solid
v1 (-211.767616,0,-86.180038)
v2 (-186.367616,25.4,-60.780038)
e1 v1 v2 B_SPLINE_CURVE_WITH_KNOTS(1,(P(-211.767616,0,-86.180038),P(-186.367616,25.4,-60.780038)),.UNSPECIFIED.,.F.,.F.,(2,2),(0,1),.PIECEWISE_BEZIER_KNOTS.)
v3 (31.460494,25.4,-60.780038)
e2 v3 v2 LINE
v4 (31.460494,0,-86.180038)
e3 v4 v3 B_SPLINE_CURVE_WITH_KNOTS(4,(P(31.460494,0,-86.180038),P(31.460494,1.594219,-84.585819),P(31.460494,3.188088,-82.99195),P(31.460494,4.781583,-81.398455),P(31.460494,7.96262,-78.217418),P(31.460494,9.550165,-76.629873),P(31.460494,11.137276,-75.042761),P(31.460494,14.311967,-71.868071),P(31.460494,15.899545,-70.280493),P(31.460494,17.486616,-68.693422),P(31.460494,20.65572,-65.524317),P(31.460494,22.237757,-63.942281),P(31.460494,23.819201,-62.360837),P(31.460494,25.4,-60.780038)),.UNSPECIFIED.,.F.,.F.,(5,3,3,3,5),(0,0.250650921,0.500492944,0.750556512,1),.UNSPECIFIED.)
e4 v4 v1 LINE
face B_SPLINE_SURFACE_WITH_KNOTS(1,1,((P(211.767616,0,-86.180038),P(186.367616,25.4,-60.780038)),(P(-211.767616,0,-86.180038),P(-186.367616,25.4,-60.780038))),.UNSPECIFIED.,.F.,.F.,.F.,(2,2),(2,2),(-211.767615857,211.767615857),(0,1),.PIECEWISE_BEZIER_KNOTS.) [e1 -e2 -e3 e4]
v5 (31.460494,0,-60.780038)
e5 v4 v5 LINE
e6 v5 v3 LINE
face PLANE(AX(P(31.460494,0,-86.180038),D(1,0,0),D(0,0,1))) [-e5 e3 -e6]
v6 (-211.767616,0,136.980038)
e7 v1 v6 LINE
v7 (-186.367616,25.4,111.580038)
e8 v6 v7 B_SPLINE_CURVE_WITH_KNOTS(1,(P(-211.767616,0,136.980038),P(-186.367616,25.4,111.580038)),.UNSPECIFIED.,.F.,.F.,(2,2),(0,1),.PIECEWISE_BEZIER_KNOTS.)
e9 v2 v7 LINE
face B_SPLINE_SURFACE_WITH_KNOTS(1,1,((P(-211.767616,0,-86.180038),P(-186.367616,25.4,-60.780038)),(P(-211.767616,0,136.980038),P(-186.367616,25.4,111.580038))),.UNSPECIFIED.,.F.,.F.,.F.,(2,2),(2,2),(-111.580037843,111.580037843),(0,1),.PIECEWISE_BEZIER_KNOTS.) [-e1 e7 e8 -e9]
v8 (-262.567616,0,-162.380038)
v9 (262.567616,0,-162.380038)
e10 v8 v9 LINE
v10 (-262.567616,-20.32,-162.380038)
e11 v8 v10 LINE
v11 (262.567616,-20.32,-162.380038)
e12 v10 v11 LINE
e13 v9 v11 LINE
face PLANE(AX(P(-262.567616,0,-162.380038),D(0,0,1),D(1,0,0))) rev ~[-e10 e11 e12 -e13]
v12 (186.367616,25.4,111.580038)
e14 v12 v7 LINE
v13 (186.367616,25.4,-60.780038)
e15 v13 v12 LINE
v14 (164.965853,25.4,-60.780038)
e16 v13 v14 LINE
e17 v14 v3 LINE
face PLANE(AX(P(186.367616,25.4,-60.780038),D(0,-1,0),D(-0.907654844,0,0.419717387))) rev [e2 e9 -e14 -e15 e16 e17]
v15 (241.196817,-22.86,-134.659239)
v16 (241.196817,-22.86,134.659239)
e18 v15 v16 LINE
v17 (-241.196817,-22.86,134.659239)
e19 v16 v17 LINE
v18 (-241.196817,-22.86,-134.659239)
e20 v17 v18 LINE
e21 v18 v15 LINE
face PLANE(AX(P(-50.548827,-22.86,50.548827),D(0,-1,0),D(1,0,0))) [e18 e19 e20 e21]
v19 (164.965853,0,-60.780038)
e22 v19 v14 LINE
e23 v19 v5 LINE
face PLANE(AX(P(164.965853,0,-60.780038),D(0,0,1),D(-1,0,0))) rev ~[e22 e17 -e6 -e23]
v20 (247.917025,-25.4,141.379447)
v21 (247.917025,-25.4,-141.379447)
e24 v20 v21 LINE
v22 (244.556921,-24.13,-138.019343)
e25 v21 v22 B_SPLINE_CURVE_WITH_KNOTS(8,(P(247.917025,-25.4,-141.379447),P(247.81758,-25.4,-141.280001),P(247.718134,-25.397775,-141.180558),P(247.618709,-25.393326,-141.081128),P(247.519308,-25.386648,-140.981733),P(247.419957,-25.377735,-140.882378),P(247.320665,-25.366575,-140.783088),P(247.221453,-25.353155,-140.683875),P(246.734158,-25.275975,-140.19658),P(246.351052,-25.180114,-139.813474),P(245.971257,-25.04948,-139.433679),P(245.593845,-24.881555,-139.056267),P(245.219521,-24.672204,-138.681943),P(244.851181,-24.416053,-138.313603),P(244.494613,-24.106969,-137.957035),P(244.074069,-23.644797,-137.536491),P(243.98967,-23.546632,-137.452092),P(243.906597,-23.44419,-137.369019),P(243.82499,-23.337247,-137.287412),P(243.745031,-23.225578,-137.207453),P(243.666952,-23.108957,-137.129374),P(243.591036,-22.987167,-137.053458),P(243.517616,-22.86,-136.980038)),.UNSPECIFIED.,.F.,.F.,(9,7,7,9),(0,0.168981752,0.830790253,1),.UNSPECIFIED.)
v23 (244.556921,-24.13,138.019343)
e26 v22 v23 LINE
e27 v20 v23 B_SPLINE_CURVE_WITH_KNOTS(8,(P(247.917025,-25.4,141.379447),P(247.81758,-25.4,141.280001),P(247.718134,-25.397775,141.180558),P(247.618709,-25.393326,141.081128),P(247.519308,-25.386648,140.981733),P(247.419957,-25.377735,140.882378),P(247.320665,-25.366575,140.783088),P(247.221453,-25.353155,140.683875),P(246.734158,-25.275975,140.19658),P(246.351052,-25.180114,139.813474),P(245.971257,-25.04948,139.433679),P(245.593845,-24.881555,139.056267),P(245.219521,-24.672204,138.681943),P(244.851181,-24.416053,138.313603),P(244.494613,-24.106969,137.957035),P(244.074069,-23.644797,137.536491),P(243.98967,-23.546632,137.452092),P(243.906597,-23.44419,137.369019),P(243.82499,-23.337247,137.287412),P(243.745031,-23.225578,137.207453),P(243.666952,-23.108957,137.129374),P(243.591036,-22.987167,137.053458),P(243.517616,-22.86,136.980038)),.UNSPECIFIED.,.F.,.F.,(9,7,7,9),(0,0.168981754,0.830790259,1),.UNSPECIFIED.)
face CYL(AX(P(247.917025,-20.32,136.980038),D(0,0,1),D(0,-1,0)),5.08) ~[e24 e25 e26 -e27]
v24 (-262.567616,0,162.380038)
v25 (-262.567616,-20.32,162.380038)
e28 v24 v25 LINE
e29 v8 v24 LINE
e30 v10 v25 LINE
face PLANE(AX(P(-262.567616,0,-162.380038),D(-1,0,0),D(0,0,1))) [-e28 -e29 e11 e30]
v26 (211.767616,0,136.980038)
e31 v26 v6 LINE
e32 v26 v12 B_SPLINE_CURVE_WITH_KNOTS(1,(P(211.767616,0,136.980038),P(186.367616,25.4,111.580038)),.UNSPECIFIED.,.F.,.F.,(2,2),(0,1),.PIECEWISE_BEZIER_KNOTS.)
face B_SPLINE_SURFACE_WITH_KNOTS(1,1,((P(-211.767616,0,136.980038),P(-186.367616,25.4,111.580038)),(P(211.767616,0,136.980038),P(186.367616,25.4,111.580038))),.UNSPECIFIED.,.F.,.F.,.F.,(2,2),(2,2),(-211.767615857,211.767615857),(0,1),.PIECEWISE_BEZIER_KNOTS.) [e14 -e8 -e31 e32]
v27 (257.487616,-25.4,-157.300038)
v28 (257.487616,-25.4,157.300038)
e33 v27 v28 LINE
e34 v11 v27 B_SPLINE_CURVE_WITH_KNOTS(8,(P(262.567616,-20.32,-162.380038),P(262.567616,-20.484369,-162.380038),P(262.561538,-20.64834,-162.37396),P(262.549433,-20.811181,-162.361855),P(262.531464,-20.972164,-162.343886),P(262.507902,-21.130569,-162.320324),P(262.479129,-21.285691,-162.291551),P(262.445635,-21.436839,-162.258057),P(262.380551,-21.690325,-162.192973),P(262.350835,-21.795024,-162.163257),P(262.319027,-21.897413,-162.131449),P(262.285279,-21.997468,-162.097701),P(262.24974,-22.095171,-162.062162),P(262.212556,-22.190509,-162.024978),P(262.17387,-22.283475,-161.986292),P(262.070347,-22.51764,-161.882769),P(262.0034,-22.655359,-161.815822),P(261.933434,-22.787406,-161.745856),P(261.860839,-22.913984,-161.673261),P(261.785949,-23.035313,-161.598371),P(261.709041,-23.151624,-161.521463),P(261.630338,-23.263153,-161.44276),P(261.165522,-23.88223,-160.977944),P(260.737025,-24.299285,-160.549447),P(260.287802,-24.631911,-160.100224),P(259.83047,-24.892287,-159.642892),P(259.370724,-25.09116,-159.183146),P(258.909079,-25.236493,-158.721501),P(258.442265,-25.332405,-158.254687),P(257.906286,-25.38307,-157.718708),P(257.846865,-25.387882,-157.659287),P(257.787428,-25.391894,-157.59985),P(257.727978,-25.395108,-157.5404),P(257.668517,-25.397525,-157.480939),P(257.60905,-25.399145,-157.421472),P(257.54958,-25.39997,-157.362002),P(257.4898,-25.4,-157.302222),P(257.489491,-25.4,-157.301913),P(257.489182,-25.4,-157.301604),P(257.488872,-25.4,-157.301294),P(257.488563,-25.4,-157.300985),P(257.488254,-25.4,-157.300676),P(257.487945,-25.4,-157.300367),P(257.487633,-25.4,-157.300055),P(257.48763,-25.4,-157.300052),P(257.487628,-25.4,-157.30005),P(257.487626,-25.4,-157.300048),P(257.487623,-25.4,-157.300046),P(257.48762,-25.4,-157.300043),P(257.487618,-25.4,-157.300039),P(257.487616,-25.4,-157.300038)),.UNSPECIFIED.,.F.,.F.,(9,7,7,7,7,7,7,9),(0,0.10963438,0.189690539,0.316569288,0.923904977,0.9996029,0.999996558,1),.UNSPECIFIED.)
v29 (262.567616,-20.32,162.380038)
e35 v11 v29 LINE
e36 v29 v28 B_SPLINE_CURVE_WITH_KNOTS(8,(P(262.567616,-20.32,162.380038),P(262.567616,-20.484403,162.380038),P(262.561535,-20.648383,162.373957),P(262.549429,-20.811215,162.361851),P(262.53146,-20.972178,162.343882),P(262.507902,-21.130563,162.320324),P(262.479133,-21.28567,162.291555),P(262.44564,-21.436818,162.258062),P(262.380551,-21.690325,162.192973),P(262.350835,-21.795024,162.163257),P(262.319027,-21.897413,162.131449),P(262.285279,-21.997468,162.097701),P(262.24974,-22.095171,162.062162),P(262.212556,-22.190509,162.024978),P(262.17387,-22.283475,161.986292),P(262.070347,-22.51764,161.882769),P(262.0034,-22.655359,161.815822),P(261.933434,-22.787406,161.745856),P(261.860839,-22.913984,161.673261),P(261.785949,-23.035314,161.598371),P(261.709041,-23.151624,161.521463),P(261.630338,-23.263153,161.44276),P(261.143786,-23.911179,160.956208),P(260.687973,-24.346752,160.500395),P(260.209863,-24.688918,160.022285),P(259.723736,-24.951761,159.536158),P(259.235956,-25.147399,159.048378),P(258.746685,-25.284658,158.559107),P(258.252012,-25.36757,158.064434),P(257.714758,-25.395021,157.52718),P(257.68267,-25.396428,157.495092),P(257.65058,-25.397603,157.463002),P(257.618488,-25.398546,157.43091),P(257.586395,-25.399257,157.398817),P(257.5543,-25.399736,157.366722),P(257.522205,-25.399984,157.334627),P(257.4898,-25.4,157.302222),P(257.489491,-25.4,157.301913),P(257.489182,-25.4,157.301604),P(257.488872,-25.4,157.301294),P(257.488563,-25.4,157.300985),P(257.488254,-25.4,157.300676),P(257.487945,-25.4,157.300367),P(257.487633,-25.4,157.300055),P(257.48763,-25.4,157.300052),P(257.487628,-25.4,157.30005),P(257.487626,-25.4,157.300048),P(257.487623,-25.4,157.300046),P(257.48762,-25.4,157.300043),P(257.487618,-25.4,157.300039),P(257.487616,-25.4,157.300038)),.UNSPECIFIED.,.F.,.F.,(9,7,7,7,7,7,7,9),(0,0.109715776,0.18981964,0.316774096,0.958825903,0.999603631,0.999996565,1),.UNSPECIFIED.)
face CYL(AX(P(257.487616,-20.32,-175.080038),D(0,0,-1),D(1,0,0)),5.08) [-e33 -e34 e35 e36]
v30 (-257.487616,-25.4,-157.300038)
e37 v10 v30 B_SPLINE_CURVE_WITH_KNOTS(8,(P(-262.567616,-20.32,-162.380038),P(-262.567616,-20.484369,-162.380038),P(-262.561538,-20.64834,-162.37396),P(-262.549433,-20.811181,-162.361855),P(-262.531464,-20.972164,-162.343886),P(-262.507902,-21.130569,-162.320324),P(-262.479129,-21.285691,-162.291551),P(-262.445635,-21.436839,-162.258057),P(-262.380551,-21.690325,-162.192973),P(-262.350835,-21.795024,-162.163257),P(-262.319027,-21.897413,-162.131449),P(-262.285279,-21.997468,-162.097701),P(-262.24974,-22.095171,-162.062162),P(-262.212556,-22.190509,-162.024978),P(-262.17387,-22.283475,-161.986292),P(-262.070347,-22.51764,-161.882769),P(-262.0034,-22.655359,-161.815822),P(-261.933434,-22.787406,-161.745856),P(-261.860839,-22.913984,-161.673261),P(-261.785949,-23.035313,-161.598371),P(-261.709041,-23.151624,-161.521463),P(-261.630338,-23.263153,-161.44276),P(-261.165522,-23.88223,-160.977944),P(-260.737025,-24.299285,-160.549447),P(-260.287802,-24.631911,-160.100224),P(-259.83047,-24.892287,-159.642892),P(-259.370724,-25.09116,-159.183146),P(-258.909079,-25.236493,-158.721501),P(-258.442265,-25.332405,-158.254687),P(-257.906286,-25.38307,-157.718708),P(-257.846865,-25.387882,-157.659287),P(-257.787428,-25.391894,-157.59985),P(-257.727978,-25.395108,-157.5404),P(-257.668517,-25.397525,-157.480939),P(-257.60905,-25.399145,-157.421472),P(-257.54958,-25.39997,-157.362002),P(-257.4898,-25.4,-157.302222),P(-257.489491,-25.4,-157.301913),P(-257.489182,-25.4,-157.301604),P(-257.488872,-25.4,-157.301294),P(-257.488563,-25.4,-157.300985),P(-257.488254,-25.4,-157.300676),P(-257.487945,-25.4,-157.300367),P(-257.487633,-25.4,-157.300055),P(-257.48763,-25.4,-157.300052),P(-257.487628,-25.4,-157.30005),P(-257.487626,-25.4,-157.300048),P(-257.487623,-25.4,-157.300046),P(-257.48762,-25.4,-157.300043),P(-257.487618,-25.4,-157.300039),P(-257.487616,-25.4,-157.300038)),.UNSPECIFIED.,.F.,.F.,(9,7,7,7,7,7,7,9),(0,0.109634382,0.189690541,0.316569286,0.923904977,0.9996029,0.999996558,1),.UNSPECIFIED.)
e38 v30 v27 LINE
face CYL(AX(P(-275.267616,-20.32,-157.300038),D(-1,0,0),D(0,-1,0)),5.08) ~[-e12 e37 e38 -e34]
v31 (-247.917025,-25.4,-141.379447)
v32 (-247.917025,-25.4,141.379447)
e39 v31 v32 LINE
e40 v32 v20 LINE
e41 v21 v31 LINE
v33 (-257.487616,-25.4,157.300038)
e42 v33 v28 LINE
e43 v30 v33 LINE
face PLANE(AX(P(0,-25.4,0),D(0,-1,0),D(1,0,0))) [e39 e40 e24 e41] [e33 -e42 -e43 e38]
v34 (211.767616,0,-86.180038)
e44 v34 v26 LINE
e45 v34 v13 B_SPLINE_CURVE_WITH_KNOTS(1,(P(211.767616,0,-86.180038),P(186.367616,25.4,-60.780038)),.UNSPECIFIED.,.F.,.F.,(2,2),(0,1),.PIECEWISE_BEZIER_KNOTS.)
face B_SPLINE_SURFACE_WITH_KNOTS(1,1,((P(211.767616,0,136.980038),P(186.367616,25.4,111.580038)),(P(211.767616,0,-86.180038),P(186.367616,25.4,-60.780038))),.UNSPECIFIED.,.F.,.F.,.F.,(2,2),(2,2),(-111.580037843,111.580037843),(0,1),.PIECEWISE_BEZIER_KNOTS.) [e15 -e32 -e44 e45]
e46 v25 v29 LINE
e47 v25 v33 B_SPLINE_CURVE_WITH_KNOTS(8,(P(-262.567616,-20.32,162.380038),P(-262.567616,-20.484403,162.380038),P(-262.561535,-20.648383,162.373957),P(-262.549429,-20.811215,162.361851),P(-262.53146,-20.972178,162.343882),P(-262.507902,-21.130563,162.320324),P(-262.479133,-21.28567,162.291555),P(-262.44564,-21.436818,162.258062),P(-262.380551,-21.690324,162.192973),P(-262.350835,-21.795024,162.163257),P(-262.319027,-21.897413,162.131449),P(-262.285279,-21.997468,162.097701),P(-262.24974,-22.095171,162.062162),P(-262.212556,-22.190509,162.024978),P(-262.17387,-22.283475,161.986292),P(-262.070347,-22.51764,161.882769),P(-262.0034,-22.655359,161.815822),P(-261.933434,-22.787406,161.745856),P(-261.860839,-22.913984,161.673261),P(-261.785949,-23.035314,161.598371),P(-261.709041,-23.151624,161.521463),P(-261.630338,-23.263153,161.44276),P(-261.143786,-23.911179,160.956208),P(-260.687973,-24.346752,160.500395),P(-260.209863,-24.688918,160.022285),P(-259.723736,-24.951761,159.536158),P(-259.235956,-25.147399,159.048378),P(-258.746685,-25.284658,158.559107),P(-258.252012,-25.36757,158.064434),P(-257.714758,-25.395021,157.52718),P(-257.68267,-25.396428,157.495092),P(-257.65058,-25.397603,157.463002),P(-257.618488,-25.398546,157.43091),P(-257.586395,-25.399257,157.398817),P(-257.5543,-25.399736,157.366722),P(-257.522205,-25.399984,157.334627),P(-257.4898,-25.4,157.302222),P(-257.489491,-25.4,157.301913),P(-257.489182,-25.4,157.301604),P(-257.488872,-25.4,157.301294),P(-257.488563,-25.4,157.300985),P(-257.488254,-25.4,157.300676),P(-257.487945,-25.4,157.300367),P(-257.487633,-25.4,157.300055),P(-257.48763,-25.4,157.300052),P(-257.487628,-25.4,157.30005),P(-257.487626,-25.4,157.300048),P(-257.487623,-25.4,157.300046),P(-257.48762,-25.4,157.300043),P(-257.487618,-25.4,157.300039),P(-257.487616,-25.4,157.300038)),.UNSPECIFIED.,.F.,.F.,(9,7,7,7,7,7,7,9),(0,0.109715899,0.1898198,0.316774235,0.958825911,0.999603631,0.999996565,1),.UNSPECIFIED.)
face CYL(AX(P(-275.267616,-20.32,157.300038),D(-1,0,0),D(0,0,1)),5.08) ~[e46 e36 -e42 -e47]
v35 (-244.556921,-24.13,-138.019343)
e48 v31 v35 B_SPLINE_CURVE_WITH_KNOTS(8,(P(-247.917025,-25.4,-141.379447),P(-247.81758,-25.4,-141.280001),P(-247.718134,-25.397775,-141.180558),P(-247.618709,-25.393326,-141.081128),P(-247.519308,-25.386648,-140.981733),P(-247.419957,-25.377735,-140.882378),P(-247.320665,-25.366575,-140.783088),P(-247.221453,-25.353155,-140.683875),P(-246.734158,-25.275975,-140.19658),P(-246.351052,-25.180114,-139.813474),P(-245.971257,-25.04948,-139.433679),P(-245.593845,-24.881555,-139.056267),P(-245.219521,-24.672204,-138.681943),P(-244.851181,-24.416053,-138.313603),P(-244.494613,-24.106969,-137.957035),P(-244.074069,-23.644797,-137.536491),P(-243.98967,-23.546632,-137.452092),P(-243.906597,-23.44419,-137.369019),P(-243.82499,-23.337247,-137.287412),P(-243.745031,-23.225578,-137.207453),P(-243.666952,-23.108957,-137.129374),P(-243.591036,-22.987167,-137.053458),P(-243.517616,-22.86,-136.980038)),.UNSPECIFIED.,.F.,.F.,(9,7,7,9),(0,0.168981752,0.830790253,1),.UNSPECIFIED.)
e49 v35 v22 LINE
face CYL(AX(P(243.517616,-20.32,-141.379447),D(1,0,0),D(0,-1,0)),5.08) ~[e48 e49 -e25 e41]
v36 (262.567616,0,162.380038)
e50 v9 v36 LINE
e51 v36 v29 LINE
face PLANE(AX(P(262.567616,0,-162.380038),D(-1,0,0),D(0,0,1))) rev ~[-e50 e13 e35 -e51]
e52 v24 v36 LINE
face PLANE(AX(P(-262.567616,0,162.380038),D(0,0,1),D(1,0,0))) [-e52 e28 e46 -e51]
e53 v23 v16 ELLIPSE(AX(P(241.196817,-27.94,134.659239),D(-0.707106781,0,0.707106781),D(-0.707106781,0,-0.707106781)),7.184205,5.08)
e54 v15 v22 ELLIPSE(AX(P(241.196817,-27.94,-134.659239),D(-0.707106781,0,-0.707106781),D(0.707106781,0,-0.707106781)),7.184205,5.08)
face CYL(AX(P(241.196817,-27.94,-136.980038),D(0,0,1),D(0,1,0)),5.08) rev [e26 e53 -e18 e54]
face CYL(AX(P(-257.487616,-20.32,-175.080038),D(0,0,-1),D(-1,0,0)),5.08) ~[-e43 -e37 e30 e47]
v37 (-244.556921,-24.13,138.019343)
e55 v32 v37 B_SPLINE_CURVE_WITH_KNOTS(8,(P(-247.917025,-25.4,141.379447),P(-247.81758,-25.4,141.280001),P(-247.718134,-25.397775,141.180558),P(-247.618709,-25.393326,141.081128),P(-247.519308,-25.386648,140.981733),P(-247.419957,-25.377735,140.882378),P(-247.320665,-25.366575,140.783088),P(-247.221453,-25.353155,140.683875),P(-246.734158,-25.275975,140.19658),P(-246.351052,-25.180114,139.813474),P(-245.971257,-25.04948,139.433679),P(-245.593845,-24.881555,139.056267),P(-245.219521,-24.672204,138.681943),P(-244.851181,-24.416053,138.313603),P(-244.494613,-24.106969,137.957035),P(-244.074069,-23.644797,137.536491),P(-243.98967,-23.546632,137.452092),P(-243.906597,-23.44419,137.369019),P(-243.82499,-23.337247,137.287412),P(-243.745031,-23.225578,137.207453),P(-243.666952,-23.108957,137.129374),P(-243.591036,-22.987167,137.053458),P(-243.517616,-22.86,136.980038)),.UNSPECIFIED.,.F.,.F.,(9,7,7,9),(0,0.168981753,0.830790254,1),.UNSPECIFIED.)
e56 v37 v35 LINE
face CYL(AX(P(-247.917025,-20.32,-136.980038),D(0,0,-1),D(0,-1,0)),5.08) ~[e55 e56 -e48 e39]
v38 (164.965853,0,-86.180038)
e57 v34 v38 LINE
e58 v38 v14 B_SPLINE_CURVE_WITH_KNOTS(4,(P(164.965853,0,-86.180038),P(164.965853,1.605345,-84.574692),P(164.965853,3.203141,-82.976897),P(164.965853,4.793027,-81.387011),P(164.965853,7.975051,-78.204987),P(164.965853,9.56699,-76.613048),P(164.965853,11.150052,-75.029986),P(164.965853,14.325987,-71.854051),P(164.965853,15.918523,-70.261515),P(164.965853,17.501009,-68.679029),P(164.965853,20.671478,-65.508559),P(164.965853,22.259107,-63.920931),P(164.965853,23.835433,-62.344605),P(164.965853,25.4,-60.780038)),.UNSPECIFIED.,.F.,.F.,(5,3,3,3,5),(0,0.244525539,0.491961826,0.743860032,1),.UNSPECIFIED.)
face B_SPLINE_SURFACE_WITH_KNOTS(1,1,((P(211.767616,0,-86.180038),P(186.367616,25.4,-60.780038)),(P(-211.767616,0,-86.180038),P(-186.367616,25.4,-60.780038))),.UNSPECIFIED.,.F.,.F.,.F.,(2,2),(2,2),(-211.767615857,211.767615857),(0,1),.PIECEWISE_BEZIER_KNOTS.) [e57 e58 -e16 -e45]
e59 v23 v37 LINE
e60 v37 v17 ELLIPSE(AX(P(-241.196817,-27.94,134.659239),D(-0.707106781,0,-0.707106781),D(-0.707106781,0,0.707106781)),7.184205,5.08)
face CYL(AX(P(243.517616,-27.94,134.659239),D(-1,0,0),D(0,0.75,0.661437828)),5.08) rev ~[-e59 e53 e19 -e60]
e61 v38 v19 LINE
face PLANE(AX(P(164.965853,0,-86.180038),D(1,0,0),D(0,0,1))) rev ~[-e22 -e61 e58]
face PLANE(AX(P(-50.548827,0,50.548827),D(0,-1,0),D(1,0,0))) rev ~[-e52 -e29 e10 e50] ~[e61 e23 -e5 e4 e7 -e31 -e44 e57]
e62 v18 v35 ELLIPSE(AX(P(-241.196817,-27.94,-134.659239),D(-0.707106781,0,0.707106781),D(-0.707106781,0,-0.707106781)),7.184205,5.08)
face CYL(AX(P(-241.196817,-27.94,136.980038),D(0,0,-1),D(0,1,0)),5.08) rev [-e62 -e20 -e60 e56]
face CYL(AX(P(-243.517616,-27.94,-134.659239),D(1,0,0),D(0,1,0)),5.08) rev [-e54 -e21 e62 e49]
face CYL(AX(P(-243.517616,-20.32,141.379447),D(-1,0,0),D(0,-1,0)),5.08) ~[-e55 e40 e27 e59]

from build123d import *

# Parameters (mm, degrees)
F0_W         = 525.1352317132
F0_H         = 324.7600756863
F0_W_2       = 487.0352317132
F0_H_2       = 273.9600756863
F1_DEPTH     = 25.4
F2_DEPTH     = 22.86
F3_T1_DEPTH  = 550.5352317132
F3_T3_DEPTH  = 350.1600756863
F3_T5_DEPTH  = 487.0352317132
F3_T7_DEPTH  = 273.9600756863
F3_T13_DEPTH = 498.0337543413
F3_T17_DEPTH = 284.9585983143
F3_T24_DEPTH = 498.0337543413
F3_T28_DEPTH = 284.9585983143
F3_T35_DEPTH = 284.9585983143
F3_T39_DEPTH = 498.0337543413
F3_T46_DEPTH = 498.0337543413
F3_T50_DEPTH = 284.9585983143
F4_R         = 5.08
F5_W         = 423.5352317132
F5_H         = 223.1600756863
F6_DEPTH     = 25.4
F6_TAPER     = 45
F7_W         = 133.505359292
F7_H         = 25.4
F8_DEPTH     = 25.4


# Not quite as in the source:
# - a fillet or chamfer that OpenCascade refuses, or shapes differently, is made with other operations: its cross-section is extruded or revolved along the edge and cut away or added


with BuildPart() as f1:
    # F0 (on Front) → F1 (new body)
    with BuildSketch(Plane.XZ):
        Rectangle(F0_W, F0_H)
        Rectangle(F0_W_2, F0_H_2, mode=Mode.SUBTRACT)
    extrude(amount=F1_DEPTH)

    # F0 (on Front) → F2 (join)
    with BuildSketch(Plane.XZ):
        Polygon((-243.5176158566, 136.9800378431), (-243.5176158566, -136.9800378431), (243.5176158566, 136.9800378431), align=None)
        Polygon((-243.5176158566, -136.9800378431), (243.5176158566, -136.9800378431), (243.5176158566, 136.9800378431), align=None)
    extrude(amount=F2_DEPTH)

    # F3: fillet of radius 5.08 on 8 edges, made by hand

    # F3_s2 → F3_t1 (cut)
    with BuildSketch(Plane.YZ.offset(-275.2676158566)):
        with BuildLine():
            ThreePointArc((-20.32, 162.3800378431), (-23.9121024484, 160.8921402916), (-25.4, 157.3000378431))
            Line((-25.4, 157.3000378431), (-25.4, 162.3800378431))
            Line((-25.4, 162.3800378431), (-20.32, 162.3800378431))
        make_face()
        with BuildLine():
            ThreePointArc((-25.4, -157.3000378431), (-23.9121024484, -160.8921402916), (-20.32, -162.3800378431))
            Line((-20.32, -162.3800378431), (-25.4, -162.3800378431))
            Line((-25.4, -162.3800378431), (-25.4, -157.3000378431))
        make_face()
    extrude(amount=F3_T1_DEPTH, mode=Mode.SUBTRACT)

    # F3_s4 → F3_t3 (cut)
    with BuildSketch(Plane.XY.offset(-175.0800378431)):
        with BuildLine():
            ThreePointArc((-262.5676158566, -20.32), (-261.079718305, -23.9121024484), (-257.4876158566, -25.4))
            Line((-257.4876158566, -25.4), (-262.5676158566, -25.4))
            Line((-262.5676158566, -25.4), (-262.5676158566, -20.32))
        make_face()
        with BuildLine():
            ThreePointArc((262.5676158566, -20.32), (261.079718305, -23.9121024484), (257.4876158566, -25.4))
            Line((257.4876158566, -25.4), (262.5676158566, -25.4))
            Line((262.5676158566, -25.4), (262.5676158566, -20.32))
        make_face()
    extrude(amount=F3_T3_DEPTH, mode=Mode.SUBTRACT)

    # F3_s6 → F3_t5 (cut)
    with BuildSketch(Plane.YZ.offset(-243.5176158566)):
        with BuildLine():
            ThreePointArc((-25.4, 141.3794468944), (-24.7194090512, 138.8394468944), (-22.86, 136.9800378431))
            Line((-22.86, 136.9800378431), (-25.4, 136.9800378431))
            Line((-25.4, 136.9800378431), (-25.4, 141.3794468944))
        make_face()
        with BuildLine():
            ThreePointArc((-25.4, -141.3794468944), (-24.7194090512, -138.8394468944), (-22.86, -136.9800378431))
            Line((-22.86, -136.9800378431), (-25.4, -136.9800378431))
            Line((-25.4, -136.9800378431), (-25.4, -141.3794468944))
        make_face()
    extrude(amount=F3_T5_DEPTH, mode=Mode.SUBTRACT)

    # F3_s8 → F3_t7 (cut)
    with BuildSketch(Plane.XY.offset(-136.9800378431)):
        with BuildLine():
            ThreePointArc((247.9170249078, -25.4), (245.3770249078, -24.7194090512), (243.5176158566, -22.86))
            Line((243.5176158566, -22.86), (243.5176158566, -25.4))
            Line((243.5176158566, -25.4), (247.9170249078, -25.4))
        make_face()
        with BuildLine():
            ThreePointArc((-247.9170249078, -25.4), (-245.3770249078, -24.7194090512), (-243.5176158566, -22.86))
            Line((-243.5176158566, -22.86), (-243.5176158566, -25.4))
            Line((-243.5176158566, -25.4), (-247.9170249078, -25.4))
        make_face()
    extrude(amount=F3_T7_DEPTH, mode=Mode.SUBTRACT)


with BuildPart() as f3_tool11:
    # F3_s12 → F3_t13 (new body)
    with BuildSketch(Plane.YZ.offset(-254.5161384847)):
        with BuildLine():
            ThreePointArc((-25.4, 141.3794468944), (-24.7194090512, 138.8394468944), (-22.86, 136.9800378431))
            Line((-22.86, 136.9800378431), (-25.4, 136.9800378431))
            Line((-25.4, 136.9800378431), (-25.4, 141.3794468944))
        make_face()
    extrude(amount=F3_T13_DEPTH)

    split(bisect_by=Plane.YZ.offset(-243.5176158566), keep=Keep.BOTTOM)


with BuildPart() as f3_tool15:
    # F3_s16 → F3_t17 (new body)
    with BuildSketch(Plane.XY.offset(-136.9800378431)):
        with BuildLine():
            ThreePointArc((-247.9170249078, -25.4), (-245.3770249078, -24.7194090512), (-243.5176158566, -22.86))
            Line((-243.5176158566, -22.86), (-243.5176158566, -25.4))
            Line((-243.5176158566, -25.4), (-247.9170249078, -25.4))
        make_face()
    extrude(amount=F3_T17_DEPTH)

    split(bisect_by=Plane.XY.offset(136.9800378431), keep=Keep.TOP)


with BuildPart() as f3_tool11_1:
    add(f3_tool11.part)

    # F3_t19: intersect F3_tool15
    add(f3_tool15.part, mode=Mode.INTERSECT)


with BuildPart() as f1_1:
    add(f1.part)

    # F3_t9: cut F3_tool11
    add(f3_tool11_1.part, mode=Mode.SUBTRACT)


with BuildPart() as f3_tool22:
    # F3_s23 → F3_t24 (new body)
    with BuildSketch(Plane.YZ.offset(-243.5176158566)):
        with BuildLine():
            ThreePointArc((-25.4, 141.3794468944), (-24.7194090512, 138.8394468944), (-22.86, 136.9800378431))
            Line((-22.86, 136.9800378431), (-25.4, 136.9800378431))
            Line((-25.4, 136.9800378431), (-25.4, 141.3794468944))
        make_face()
    extrude(amount=F3_T24_DEPTH)

    split(bisect_by=Plane.YZ.offset(243.5176158566), keep=Keep.TOP)


with BuildPart() as f3_tool26:
    # F3_s27 → F3_t28 (new body)
    with BuildSketch(Plane.XY.offset(147.9785604712)):
        with BuildLine():
            ThreePointArc((247.9170249078, -25.4), (245.3770249078, -24.7194090512), (243.5176158566, -22.86))
            Line((243.5176158566, -22.86), (243.5176158566, -25.4))
            Line((243.5176158566, -25.4), (247.9170249078, -25.4))
        make_face()
    extrude(amount=-F3_T28_DEPTH)

    split(bisect_by=Plane.XY.offset(136.9800378431), keep=Keep.TOP)


with BuildPart() as f3_tool22_1:
    add(f3_tool22.part)

    # F3_t30: intersect F3_tool26
    add(f3_tool26.part, mode=Mode.INTERSECT)


with BuildPart() as f1_2:
    add(f1_1.part)

    # F3_t20: cut F3_tool22
    add(f3_tool22_1.part, mode=Mode.SUBTRACT)


with BuildPart() as f3_tool33:
    # F3_s34 → F3_t35 (new body)
    with BuildSketch(Plane.XY.offset(136.9800378431)):
        with BuildLine():
            ThreePointArc((247.9170249078, -25.4), (245.3770249078, -24.7194090512), (243.5176158566, -22.86))
            Line((243.5176158566, -22.86), (243.5176158566, -25.4))
            Line((243.5176158566, -25.4), (247.9170249078, -25.4))
        make_face()
    extrude(amount=-F3_T35_DEPTH)

    split(bisect_by=Plane.XY.offset(-136.9800378431), keep=Keep.BOTTOM)


with BuildPart() as f3_tool37:
    # F3_s38 → F3_t39 (new body)
    with BuildSketch(Plane.YZ.offset(254.5161384847)):
        with BuildLine():
            ThreePointArc((-25.4, -141.3794468944), (-24.7194090512, -138.8394468944), (-22.86, -136.9800378431))
            Line((-22.86, -136.9800378431), (-25.4, -136.9800378431))
            Line((-25.4, -136.9800378431), (-25.4, -141.3794468944))
        make_face()
    extrude(amount=-F3_T39_DEPTH)

    split(bisect_by=Plane.YZ.offset(243.5176158566), keep=Keep.TOP)


with BuildPart() as f3_tool33_1:
    add(f3_tool33.part)

    # F3_t41: intersect F3_tool37
    add(f3_tool37.part, mode=Mode.INTERSECT)


with BuildPart() as f1_3:
    add(f1_2.part)

    # F3_t31: cut F3_tool33
    add(f3_tool33_1.part, mode=Mode.SUBTRACT)


with BuildPart() as f3_tool44:
    # F3_s45 → F3_t46 (new body)
    with BuildSketch(Plane.YZ.offset(243.5176158566)):
        with BuildLine():
            ThreePointArc((-25.4, -141.3794468944), (-24.7194090512, -138.8394468944), (-22.86, -136.9800378431))
            Line((-22.86, -136.9800378431), (-25.4, -136.9800378431))
            Line((-25.4, -136.9800378431), (-25.4, -141.3794468944))
        make_face()
    extrude(amount=-F3_T46_DEPTH)

    split(bisect_by=Plane.YZ.offset(-243.5176158566), keep=Keep.BOTTOM)


with BuildPart() as f3_tool48:
    # F3_s49 → F3_t50 (new body)
    with BuildSketch(Plane.XY.offset(-147.9785604712)):
        with BuildLine():
            ThreePointArc((-247.9170249078, -25.4), (-245.3770249078, -24.7194090512), (-243.5176158566, -22.86))
            Line((-243.5176158566, -22.86), (-243.5176158566, -25.4))
            Line((-243.5176158566, -25.4), (-247.9170249078, -25.4))
        make_face()
    extrude(amount=F3_T50_DEPTH)

    split(bisect_by=Plane.XY.offset(-136.9800378431), keep=Keep.BOTTOM)


with BuildPart() as f3_tool44_1:
    add(f3_tool44.part)

    # F3_t52: intersect F3_tool48
    add(f3_tool48.part, mode=Mode.INTERSECT)


with BuildPart() as f1_4:
    add(f1_3.part)

    # F3_t42: cut F3_tool44
    add(f3_tool44_1.part, mode=Mode.SUBTRACT)

    # F4
    f4_edges = [f1_4.edges().sort_by_distance(p)[0] for p in [
        (0, -22.86, 136.980038),
        (-243.517616, -22.86, 0),
        (0, -22.86, -136.980038),
        (243.517616, -22.86, 0),
    ]]
    fillet(f4_edges, radius=F4_R)

    # F5 (on face) → F6 (join)
    with BuildSketch(Plane(origin=(0, 0, 0), x_dir=(-1, 0, 0), z_dir=(0, 1, 0))):
        with Locations((0, 25.4)):
            Rectangle(F5_W, F5_H)
    extrude(amount=F6_DEPTH, taper=F6_TAPER)

    # F7 (on face) → F8 (cut)
    with BuildSketch(Plane(origin=(0, 0, 0), x_dir=(-1, 0, 0), z_dir=(0, 1, 0))):
        with Locations((-98.213173449, -73.4800378431)):
            Rectangle(F7_W, F7_H)
    extrude(amount=F8_DEPTH, mode=Mode.SUBTRACT)


solid = f1_4.part
